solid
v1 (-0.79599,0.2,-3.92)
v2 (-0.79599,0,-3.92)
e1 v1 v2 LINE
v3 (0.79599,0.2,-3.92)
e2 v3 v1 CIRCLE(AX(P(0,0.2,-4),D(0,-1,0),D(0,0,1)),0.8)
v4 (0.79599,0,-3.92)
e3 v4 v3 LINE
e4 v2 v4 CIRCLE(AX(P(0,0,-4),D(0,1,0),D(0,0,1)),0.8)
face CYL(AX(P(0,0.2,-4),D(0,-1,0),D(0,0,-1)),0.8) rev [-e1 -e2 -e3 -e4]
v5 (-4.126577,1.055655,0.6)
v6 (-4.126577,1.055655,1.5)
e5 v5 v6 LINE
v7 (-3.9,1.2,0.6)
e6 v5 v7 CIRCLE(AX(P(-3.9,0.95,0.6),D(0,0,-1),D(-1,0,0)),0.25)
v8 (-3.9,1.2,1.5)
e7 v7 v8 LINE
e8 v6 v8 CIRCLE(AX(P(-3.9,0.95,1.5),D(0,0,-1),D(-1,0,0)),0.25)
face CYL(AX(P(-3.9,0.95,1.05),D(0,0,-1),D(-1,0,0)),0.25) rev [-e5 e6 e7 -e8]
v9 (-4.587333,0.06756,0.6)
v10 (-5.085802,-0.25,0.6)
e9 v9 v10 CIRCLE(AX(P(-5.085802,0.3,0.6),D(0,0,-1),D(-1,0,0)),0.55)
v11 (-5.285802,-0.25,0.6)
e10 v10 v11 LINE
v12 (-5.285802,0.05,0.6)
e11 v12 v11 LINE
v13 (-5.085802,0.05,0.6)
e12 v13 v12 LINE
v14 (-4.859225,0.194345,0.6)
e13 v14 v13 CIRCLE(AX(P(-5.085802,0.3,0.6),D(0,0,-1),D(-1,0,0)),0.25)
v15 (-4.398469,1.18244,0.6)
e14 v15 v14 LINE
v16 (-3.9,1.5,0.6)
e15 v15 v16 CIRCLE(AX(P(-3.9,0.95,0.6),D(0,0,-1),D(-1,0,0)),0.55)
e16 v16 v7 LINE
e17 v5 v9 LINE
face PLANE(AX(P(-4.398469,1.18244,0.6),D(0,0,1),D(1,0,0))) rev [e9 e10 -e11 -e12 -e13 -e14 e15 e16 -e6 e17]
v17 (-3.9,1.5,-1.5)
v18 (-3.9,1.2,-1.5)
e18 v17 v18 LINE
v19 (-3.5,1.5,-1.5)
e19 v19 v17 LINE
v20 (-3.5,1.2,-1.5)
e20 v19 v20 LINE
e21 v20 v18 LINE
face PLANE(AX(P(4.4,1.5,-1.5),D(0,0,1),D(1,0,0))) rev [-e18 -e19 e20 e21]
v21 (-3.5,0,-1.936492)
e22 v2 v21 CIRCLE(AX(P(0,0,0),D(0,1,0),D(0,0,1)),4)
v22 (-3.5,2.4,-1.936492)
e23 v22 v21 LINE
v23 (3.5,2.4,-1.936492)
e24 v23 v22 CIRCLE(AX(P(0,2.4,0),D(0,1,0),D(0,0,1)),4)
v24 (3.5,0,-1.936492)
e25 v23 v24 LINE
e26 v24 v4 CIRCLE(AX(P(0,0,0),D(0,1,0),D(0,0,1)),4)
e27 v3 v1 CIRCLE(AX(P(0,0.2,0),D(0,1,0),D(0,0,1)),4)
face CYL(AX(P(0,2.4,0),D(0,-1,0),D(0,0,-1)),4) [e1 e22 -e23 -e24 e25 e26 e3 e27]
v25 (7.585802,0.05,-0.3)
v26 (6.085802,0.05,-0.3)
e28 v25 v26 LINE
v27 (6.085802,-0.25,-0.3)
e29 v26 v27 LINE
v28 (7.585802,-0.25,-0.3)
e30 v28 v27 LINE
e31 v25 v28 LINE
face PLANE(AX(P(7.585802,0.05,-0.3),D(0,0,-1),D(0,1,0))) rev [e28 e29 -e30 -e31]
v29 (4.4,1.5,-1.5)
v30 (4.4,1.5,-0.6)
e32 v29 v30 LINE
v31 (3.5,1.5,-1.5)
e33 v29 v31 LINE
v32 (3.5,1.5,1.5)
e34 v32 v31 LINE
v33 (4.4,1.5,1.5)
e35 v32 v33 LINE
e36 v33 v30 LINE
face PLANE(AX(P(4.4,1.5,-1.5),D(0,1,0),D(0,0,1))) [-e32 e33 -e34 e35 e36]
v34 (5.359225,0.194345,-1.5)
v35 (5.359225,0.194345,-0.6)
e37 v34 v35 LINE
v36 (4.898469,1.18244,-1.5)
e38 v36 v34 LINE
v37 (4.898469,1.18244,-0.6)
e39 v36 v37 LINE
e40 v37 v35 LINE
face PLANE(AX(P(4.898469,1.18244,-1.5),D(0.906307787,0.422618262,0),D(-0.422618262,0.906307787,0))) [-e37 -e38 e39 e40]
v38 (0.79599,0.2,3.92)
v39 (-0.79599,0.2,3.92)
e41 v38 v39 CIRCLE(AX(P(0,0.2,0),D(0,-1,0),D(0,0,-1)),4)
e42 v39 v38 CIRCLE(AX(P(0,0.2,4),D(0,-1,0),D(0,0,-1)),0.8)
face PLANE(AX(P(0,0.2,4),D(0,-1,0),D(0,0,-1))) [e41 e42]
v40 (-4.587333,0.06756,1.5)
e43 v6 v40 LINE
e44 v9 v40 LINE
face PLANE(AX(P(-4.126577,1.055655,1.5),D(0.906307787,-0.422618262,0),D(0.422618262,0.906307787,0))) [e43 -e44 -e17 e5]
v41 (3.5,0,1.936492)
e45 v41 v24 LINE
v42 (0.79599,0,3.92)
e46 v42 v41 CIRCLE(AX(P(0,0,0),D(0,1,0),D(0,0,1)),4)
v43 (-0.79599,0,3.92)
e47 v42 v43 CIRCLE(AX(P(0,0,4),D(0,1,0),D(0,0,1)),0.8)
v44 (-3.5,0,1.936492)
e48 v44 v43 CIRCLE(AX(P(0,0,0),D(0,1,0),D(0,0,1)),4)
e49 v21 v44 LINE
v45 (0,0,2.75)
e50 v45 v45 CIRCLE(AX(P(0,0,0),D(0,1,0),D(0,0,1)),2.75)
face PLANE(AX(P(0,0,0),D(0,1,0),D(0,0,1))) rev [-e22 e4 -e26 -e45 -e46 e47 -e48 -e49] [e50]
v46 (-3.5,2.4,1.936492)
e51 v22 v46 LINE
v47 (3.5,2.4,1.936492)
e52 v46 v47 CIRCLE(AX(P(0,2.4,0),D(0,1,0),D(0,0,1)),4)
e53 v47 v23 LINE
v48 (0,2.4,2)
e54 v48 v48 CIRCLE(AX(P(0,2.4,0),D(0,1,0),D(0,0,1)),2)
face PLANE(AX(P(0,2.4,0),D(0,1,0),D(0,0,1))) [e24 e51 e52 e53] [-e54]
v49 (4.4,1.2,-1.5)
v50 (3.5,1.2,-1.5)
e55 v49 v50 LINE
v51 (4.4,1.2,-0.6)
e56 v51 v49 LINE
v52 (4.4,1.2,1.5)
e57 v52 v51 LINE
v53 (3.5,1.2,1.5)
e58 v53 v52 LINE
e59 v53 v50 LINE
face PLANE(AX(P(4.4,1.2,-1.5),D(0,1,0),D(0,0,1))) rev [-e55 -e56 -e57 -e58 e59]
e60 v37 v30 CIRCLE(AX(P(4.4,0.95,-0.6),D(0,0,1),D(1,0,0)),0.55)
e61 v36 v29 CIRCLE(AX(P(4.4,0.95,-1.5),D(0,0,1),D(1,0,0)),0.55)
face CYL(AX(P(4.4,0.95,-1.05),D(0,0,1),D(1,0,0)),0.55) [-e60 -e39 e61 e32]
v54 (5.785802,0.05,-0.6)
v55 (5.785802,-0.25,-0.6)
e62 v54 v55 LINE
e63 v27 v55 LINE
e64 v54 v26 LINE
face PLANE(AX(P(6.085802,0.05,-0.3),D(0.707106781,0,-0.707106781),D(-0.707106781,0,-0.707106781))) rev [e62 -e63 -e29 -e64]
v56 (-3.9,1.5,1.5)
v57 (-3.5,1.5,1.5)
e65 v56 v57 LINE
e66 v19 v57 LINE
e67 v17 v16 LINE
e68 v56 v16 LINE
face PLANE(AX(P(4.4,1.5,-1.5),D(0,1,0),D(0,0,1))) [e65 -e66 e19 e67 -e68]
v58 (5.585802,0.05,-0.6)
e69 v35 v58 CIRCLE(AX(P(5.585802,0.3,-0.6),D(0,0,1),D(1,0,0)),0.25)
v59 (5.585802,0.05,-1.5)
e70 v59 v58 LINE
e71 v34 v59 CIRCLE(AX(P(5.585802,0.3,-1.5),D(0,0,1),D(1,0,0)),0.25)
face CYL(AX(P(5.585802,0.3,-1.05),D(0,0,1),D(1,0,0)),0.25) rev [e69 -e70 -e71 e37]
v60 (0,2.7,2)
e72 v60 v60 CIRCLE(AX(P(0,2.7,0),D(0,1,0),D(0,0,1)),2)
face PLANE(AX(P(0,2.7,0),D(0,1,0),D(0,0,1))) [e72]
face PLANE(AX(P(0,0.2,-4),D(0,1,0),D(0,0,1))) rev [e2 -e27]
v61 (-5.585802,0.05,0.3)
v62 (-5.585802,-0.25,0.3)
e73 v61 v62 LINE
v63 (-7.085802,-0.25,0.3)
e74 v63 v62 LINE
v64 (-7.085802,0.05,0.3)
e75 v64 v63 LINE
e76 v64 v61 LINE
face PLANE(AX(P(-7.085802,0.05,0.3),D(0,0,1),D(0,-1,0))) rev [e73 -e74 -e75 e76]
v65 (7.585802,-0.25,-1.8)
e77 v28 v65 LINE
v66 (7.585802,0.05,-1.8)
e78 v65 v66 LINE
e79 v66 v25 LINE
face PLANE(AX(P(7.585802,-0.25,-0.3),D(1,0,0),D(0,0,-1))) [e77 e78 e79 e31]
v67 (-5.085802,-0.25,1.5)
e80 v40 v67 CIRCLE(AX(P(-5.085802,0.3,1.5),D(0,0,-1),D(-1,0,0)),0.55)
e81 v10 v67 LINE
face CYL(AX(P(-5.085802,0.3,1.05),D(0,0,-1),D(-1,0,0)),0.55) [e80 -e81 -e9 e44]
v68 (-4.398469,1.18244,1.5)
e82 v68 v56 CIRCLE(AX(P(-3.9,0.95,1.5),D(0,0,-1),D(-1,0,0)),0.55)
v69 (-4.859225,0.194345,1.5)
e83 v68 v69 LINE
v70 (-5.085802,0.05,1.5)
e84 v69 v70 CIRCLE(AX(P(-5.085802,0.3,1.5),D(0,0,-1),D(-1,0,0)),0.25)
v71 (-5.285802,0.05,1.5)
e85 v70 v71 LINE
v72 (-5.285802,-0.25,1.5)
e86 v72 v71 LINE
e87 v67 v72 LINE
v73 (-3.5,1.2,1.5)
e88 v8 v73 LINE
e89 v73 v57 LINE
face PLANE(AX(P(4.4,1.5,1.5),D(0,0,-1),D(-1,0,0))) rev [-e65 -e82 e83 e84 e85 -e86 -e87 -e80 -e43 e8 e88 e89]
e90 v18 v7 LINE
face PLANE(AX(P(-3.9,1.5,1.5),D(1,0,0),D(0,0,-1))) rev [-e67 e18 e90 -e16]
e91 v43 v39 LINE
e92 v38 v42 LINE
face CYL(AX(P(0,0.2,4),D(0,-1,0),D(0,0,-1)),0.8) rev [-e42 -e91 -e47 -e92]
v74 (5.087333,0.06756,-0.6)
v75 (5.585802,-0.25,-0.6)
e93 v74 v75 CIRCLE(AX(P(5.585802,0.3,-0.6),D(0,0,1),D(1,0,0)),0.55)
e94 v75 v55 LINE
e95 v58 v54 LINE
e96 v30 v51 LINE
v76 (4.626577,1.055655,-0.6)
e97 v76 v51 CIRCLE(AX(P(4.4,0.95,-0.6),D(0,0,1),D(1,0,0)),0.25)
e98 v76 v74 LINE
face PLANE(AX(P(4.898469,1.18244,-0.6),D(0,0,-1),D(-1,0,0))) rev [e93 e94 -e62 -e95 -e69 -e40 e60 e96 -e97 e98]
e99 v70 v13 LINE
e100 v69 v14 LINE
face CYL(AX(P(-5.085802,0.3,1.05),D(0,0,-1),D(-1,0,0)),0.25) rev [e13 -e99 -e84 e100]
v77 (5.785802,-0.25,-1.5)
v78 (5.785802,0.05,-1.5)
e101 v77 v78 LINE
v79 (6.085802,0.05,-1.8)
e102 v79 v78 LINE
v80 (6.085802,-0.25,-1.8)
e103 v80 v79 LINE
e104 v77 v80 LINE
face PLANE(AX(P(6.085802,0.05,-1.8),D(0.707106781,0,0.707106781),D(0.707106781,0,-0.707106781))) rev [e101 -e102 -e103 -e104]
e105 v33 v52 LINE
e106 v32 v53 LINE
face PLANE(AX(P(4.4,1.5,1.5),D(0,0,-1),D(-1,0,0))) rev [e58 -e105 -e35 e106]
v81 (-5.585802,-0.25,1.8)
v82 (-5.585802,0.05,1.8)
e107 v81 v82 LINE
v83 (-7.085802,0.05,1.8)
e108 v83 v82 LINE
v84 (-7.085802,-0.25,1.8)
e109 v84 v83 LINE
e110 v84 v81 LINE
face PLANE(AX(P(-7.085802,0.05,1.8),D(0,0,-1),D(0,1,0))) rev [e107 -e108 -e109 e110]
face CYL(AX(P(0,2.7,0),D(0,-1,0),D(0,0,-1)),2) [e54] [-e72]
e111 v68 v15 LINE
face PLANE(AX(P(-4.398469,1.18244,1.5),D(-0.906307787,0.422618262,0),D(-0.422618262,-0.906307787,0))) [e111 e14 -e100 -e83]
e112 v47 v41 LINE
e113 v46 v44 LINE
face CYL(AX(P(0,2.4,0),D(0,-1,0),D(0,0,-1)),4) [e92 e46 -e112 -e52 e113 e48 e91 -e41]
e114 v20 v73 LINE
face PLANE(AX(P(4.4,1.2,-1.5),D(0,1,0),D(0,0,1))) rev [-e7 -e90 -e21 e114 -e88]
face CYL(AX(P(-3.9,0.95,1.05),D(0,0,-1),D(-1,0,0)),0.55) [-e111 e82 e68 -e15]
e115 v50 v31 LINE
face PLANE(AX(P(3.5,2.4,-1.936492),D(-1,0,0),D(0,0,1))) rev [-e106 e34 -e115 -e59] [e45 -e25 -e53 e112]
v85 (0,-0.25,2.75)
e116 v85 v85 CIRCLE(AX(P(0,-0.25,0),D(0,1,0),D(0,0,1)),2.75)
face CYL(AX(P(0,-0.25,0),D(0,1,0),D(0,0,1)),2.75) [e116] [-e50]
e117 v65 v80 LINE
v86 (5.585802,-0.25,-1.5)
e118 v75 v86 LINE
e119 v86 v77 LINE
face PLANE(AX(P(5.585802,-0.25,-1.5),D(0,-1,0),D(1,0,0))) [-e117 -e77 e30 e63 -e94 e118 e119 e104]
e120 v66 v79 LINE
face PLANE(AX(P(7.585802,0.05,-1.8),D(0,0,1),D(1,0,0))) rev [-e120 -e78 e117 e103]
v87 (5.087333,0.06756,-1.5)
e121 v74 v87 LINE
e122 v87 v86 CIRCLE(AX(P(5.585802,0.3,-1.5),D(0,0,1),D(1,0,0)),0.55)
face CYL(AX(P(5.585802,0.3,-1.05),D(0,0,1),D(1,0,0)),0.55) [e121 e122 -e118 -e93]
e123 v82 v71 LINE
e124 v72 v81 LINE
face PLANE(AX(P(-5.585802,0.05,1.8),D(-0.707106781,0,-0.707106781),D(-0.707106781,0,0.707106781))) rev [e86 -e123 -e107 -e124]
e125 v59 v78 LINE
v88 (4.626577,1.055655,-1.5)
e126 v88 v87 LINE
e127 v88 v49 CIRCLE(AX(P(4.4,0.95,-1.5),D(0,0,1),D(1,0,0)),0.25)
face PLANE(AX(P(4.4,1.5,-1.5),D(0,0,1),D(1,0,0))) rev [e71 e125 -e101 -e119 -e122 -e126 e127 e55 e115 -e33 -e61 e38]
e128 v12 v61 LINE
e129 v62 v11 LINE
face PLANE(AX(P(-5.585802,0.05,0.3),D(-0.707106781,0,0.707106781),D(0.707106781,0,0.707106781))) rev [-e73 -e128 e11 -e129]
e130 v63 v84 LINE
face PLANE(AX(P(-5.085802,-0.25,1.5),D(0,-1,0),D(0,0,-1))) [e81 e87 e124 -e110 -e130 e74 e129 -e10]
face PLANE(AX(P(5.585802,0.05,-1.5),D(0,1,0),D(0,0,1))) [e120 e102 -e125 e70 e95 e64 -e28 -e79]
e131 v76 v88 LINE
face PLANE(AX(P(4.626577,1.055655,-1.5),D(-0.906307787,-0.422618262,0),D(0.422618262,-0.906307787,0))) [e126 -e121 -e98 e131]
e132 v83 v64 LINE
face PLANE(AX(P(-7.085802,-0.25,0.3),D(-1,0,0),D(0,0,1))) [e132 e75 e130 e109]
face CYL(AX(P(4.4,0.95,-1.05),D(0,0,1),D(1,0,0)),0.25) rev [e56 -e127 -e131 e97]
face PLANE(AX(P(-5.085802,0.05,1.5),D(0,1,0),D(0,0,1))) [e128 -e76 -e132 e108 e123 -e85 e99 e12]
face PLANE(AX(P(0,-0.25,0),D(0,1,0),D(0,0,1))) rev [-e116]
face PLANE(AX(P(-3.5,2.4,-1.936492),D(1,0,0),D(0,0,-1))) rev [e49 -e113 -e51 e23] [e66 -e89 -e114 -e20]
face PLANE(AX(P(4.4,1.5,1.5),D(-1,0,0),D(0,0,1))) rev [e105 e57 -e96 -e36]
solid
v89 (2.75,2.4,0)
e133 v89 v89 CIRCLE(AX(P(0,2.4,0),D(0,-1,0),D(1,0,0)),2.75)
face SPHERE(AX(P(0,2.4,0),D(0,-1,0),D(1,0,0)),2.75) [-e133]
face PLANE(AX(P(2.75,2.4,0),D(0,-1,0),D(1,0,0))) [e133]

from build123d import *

# Parameters (mm, degrees)
BOSS_EXTRUDE1_DEPTH = 2.4
SKETCH2_R           = 2.75
BOSS_EXTRUDE2_DEPTH = 0.25
SKETCH3_R           = 2
BOSS_EXTRUDE3_DEPTH = 0.3
SKETCH5_W           = 8.3
SKETCH5_H           = 3
BOSS_EXTRUDE4_DEPTH = 0.15
SKETCH6_W           = 0.9
SKETCH6_H           = 0.3
SKETCH8_W           = 0.9
SKETCH8_H           = 0.3
SKETCH10_W          = 1.5
SKETCH10_H          = 0.3
BOSS_EXTRUDE5_DEPTH = 1.8
SKETCH11_W          = 1.5
SKETCH11_H          = 0.3
BOSS_EXTRUDE6_DEPTH = 1.8
CHAMFER1_SIZE       = 0.3
SKETCH12_R          = 0.8
CUT_EXTRUDE1_DEPTH  = 0.2


with BuildPart() as part:
    # Sketch1 → Boss-Extrude1 (new body)
    with BuildSketch(Plane(origin=(0, 0, 0), x_dir=(1, 0, 0), z_dir=(0, 1, 0))):
        with BuildLine():
            Line((-3.5, 1.936491673), (-3.5, -1.936491673))
            ThreePointArc((-3.5, -1.936491673), (0, -4), (3.5, -1.936491673))
            Line((3.5, -1.936491673), (3.5, 1.936491673))
            ThreePointArc((3.5, 1.936491673), (0, 4), (-3.5, 1.936491673))
        make_face()
    extrude(amount=BOSS_EXTRUDE1_DEPTH)

    # Sketch2 → Boss-Extrude2 (add)
    with BuildSketch(Plane(origin=(0, 0, 0), x_dir=(1, 0, 0), z_dir=(0, 1, 0))):
        with Locations(Location((0, 0, 0), (0, 0, 270))):
            Circle(SKETCH2_R)
    extrude(amount=-BOSS_EXTRUDE2_DEPTH)

    # Sketch3 → Boss-Extrude3 (add)
    with BuildSketch(Plane(origin=(0, 2.4, 0), x_dir=(1, 0, 0), z_dir=(0, 1, 0))):
        with Locations(Location((0, 0, 0), (0, 0, 270))):
            Circle(SKETCH3_R)
    extrude(amount=BOSS_EXTRUDE3_DEPTH)

    # Sketch5 → Boss-Extrude4 (add, symmetric)
    with BuildSketch(Plane(origin=(0, 1.35, 0), x_dir=(-1, 0, 0), z_dir=(0, 1, 0))):
        with Locations((-0.25, 0)):
            Rectangle(SKETCH5_W, SKETCH5_H)
    extrude(amount=BOSS_EXTRUDE4_DEPTH, both=True)

    # Sweep2: sweep along a path in Sketch7
    with BuildLine(Plane.XY.offset(-1.05)) as sweep2_path:
        Line((5.785802313, -0.1), (5.585802313, -0.1))
        ThreePointArc((5.585802313, -0.1), (5.37088247, -0.037356578), (5.223279198, 0.130952695))
        Line((5.223279198, 0.130952695), (4.762523115, 1.119047305))
        ThreePointArc((4.762523115, 1.119047305), (4.614919843, 1.287356578), (4.4, 1.35))
    # Sketch6 → Sweep2 (sweep)
    with BuildSketch(Plane(origin=(4.4, 0, 0), x_dir=(0, 0, -1), z_dir=(1, 0, 0))):
        with Locations((1.05, 1.35)):
            Rectangle(SKETCH6_W, SKETCH6_H)
    sweep(path=sweep2_path.line)

    # Sweep3: sweep along a path in Sketch9
    with BuildLine(Plane.XY.offset(1.05)) as sweep3_path:
        Line((-5.285802313, -0.1), (-5.085802313, -0.1))
        ThreePointArc((-5.085802313, -0.1), (-4.87088247, -0.037356578), (-4.723279198, 0.130952695))
        Line((-4.723279198, 0.130952695), (-4.262523115, 1.119047305))
        ThreePointArc((-4.262523115, 1.119047305), (-4.114919843, 1.287356578), (-3.9, 1.35))
    # Sketch8 → Sweep3 (sweep)
    with BuildSketch(Plane.ZY.offset(3.9)):
        with Locations((1.05, 1.35)):
            Rectangle(SKETCH8_W, SKETCH8_H)
    sweep(path=sweep3_path.line)

    # Sketch10 → Boss-Extrude5 (add)
    with BuildSketch(Plane.ZY.offset(5.285802313)):
        with Locations((1.05, -0.1)):
            Rectangle(SKETCH10_W, SKETCH10_H)
    extrude(amount=BOSS_EXTRUDE5_DEPTH)

    # Sketch11 → Boss-Extrude6 (add)
    with BuildSketch(Plane(origin=(5.785802313, 0, 0), x_dir=(0, 0, -1), z_dir=(1, 0, 0))):
        with Locations((1.05, -0.1)):
            Rectangle(SKETCH11_W, SKETCH11_H)
    extrude(amount=BOSS_EXTRUDE6_DEPTH)

    # Chamfer1
    chamfer1_edges = [part.edges().sort_by_distance(p)[0] for p in [
        (5.785802313, -0.1, -0.3),
        (5.785802313, -0.1, -1.8),
        (-5.285802313, -0.1, 0.3),
        (-5.285802313, -0.1, 1.8),
    ]]
    chamfer(chamfer1_edges, length=CHAMFER1_SIZE - 0.0001)  # a hair under: the kernel refuses the full size

    # Sketch12 → Cut-Extrude1 (cut)
    with BuildSketch(Plane.XZ):
        with Locations((0, 4)):
            Circle(SKETCH12_R)
        with Locations((0, -4)):
            Circle(SKETCH12_R)
    extrude(amount=-CUT_EXTRUDE1_DEPTH, mode=Mode.SUBTRACT)


with BuildPart() as body_2:
    # Sketch4 → Revolve1 (revolve)
    with BuildSketch(Plane.XY):
        with BuildLine():
            Line((0, 2.4), (0, 5.15))
            ThreePointArc((0, 5.15), (1.944543648, 4.344543648), (2.75, 2.4))
            Line((2.75, 2.4), (0, 2.4))
        make_face()
    revolve(axis=Axis((0, 2.4, 0), (0, 1, 0)))


solid = Compound([part.part, body_2.part])
